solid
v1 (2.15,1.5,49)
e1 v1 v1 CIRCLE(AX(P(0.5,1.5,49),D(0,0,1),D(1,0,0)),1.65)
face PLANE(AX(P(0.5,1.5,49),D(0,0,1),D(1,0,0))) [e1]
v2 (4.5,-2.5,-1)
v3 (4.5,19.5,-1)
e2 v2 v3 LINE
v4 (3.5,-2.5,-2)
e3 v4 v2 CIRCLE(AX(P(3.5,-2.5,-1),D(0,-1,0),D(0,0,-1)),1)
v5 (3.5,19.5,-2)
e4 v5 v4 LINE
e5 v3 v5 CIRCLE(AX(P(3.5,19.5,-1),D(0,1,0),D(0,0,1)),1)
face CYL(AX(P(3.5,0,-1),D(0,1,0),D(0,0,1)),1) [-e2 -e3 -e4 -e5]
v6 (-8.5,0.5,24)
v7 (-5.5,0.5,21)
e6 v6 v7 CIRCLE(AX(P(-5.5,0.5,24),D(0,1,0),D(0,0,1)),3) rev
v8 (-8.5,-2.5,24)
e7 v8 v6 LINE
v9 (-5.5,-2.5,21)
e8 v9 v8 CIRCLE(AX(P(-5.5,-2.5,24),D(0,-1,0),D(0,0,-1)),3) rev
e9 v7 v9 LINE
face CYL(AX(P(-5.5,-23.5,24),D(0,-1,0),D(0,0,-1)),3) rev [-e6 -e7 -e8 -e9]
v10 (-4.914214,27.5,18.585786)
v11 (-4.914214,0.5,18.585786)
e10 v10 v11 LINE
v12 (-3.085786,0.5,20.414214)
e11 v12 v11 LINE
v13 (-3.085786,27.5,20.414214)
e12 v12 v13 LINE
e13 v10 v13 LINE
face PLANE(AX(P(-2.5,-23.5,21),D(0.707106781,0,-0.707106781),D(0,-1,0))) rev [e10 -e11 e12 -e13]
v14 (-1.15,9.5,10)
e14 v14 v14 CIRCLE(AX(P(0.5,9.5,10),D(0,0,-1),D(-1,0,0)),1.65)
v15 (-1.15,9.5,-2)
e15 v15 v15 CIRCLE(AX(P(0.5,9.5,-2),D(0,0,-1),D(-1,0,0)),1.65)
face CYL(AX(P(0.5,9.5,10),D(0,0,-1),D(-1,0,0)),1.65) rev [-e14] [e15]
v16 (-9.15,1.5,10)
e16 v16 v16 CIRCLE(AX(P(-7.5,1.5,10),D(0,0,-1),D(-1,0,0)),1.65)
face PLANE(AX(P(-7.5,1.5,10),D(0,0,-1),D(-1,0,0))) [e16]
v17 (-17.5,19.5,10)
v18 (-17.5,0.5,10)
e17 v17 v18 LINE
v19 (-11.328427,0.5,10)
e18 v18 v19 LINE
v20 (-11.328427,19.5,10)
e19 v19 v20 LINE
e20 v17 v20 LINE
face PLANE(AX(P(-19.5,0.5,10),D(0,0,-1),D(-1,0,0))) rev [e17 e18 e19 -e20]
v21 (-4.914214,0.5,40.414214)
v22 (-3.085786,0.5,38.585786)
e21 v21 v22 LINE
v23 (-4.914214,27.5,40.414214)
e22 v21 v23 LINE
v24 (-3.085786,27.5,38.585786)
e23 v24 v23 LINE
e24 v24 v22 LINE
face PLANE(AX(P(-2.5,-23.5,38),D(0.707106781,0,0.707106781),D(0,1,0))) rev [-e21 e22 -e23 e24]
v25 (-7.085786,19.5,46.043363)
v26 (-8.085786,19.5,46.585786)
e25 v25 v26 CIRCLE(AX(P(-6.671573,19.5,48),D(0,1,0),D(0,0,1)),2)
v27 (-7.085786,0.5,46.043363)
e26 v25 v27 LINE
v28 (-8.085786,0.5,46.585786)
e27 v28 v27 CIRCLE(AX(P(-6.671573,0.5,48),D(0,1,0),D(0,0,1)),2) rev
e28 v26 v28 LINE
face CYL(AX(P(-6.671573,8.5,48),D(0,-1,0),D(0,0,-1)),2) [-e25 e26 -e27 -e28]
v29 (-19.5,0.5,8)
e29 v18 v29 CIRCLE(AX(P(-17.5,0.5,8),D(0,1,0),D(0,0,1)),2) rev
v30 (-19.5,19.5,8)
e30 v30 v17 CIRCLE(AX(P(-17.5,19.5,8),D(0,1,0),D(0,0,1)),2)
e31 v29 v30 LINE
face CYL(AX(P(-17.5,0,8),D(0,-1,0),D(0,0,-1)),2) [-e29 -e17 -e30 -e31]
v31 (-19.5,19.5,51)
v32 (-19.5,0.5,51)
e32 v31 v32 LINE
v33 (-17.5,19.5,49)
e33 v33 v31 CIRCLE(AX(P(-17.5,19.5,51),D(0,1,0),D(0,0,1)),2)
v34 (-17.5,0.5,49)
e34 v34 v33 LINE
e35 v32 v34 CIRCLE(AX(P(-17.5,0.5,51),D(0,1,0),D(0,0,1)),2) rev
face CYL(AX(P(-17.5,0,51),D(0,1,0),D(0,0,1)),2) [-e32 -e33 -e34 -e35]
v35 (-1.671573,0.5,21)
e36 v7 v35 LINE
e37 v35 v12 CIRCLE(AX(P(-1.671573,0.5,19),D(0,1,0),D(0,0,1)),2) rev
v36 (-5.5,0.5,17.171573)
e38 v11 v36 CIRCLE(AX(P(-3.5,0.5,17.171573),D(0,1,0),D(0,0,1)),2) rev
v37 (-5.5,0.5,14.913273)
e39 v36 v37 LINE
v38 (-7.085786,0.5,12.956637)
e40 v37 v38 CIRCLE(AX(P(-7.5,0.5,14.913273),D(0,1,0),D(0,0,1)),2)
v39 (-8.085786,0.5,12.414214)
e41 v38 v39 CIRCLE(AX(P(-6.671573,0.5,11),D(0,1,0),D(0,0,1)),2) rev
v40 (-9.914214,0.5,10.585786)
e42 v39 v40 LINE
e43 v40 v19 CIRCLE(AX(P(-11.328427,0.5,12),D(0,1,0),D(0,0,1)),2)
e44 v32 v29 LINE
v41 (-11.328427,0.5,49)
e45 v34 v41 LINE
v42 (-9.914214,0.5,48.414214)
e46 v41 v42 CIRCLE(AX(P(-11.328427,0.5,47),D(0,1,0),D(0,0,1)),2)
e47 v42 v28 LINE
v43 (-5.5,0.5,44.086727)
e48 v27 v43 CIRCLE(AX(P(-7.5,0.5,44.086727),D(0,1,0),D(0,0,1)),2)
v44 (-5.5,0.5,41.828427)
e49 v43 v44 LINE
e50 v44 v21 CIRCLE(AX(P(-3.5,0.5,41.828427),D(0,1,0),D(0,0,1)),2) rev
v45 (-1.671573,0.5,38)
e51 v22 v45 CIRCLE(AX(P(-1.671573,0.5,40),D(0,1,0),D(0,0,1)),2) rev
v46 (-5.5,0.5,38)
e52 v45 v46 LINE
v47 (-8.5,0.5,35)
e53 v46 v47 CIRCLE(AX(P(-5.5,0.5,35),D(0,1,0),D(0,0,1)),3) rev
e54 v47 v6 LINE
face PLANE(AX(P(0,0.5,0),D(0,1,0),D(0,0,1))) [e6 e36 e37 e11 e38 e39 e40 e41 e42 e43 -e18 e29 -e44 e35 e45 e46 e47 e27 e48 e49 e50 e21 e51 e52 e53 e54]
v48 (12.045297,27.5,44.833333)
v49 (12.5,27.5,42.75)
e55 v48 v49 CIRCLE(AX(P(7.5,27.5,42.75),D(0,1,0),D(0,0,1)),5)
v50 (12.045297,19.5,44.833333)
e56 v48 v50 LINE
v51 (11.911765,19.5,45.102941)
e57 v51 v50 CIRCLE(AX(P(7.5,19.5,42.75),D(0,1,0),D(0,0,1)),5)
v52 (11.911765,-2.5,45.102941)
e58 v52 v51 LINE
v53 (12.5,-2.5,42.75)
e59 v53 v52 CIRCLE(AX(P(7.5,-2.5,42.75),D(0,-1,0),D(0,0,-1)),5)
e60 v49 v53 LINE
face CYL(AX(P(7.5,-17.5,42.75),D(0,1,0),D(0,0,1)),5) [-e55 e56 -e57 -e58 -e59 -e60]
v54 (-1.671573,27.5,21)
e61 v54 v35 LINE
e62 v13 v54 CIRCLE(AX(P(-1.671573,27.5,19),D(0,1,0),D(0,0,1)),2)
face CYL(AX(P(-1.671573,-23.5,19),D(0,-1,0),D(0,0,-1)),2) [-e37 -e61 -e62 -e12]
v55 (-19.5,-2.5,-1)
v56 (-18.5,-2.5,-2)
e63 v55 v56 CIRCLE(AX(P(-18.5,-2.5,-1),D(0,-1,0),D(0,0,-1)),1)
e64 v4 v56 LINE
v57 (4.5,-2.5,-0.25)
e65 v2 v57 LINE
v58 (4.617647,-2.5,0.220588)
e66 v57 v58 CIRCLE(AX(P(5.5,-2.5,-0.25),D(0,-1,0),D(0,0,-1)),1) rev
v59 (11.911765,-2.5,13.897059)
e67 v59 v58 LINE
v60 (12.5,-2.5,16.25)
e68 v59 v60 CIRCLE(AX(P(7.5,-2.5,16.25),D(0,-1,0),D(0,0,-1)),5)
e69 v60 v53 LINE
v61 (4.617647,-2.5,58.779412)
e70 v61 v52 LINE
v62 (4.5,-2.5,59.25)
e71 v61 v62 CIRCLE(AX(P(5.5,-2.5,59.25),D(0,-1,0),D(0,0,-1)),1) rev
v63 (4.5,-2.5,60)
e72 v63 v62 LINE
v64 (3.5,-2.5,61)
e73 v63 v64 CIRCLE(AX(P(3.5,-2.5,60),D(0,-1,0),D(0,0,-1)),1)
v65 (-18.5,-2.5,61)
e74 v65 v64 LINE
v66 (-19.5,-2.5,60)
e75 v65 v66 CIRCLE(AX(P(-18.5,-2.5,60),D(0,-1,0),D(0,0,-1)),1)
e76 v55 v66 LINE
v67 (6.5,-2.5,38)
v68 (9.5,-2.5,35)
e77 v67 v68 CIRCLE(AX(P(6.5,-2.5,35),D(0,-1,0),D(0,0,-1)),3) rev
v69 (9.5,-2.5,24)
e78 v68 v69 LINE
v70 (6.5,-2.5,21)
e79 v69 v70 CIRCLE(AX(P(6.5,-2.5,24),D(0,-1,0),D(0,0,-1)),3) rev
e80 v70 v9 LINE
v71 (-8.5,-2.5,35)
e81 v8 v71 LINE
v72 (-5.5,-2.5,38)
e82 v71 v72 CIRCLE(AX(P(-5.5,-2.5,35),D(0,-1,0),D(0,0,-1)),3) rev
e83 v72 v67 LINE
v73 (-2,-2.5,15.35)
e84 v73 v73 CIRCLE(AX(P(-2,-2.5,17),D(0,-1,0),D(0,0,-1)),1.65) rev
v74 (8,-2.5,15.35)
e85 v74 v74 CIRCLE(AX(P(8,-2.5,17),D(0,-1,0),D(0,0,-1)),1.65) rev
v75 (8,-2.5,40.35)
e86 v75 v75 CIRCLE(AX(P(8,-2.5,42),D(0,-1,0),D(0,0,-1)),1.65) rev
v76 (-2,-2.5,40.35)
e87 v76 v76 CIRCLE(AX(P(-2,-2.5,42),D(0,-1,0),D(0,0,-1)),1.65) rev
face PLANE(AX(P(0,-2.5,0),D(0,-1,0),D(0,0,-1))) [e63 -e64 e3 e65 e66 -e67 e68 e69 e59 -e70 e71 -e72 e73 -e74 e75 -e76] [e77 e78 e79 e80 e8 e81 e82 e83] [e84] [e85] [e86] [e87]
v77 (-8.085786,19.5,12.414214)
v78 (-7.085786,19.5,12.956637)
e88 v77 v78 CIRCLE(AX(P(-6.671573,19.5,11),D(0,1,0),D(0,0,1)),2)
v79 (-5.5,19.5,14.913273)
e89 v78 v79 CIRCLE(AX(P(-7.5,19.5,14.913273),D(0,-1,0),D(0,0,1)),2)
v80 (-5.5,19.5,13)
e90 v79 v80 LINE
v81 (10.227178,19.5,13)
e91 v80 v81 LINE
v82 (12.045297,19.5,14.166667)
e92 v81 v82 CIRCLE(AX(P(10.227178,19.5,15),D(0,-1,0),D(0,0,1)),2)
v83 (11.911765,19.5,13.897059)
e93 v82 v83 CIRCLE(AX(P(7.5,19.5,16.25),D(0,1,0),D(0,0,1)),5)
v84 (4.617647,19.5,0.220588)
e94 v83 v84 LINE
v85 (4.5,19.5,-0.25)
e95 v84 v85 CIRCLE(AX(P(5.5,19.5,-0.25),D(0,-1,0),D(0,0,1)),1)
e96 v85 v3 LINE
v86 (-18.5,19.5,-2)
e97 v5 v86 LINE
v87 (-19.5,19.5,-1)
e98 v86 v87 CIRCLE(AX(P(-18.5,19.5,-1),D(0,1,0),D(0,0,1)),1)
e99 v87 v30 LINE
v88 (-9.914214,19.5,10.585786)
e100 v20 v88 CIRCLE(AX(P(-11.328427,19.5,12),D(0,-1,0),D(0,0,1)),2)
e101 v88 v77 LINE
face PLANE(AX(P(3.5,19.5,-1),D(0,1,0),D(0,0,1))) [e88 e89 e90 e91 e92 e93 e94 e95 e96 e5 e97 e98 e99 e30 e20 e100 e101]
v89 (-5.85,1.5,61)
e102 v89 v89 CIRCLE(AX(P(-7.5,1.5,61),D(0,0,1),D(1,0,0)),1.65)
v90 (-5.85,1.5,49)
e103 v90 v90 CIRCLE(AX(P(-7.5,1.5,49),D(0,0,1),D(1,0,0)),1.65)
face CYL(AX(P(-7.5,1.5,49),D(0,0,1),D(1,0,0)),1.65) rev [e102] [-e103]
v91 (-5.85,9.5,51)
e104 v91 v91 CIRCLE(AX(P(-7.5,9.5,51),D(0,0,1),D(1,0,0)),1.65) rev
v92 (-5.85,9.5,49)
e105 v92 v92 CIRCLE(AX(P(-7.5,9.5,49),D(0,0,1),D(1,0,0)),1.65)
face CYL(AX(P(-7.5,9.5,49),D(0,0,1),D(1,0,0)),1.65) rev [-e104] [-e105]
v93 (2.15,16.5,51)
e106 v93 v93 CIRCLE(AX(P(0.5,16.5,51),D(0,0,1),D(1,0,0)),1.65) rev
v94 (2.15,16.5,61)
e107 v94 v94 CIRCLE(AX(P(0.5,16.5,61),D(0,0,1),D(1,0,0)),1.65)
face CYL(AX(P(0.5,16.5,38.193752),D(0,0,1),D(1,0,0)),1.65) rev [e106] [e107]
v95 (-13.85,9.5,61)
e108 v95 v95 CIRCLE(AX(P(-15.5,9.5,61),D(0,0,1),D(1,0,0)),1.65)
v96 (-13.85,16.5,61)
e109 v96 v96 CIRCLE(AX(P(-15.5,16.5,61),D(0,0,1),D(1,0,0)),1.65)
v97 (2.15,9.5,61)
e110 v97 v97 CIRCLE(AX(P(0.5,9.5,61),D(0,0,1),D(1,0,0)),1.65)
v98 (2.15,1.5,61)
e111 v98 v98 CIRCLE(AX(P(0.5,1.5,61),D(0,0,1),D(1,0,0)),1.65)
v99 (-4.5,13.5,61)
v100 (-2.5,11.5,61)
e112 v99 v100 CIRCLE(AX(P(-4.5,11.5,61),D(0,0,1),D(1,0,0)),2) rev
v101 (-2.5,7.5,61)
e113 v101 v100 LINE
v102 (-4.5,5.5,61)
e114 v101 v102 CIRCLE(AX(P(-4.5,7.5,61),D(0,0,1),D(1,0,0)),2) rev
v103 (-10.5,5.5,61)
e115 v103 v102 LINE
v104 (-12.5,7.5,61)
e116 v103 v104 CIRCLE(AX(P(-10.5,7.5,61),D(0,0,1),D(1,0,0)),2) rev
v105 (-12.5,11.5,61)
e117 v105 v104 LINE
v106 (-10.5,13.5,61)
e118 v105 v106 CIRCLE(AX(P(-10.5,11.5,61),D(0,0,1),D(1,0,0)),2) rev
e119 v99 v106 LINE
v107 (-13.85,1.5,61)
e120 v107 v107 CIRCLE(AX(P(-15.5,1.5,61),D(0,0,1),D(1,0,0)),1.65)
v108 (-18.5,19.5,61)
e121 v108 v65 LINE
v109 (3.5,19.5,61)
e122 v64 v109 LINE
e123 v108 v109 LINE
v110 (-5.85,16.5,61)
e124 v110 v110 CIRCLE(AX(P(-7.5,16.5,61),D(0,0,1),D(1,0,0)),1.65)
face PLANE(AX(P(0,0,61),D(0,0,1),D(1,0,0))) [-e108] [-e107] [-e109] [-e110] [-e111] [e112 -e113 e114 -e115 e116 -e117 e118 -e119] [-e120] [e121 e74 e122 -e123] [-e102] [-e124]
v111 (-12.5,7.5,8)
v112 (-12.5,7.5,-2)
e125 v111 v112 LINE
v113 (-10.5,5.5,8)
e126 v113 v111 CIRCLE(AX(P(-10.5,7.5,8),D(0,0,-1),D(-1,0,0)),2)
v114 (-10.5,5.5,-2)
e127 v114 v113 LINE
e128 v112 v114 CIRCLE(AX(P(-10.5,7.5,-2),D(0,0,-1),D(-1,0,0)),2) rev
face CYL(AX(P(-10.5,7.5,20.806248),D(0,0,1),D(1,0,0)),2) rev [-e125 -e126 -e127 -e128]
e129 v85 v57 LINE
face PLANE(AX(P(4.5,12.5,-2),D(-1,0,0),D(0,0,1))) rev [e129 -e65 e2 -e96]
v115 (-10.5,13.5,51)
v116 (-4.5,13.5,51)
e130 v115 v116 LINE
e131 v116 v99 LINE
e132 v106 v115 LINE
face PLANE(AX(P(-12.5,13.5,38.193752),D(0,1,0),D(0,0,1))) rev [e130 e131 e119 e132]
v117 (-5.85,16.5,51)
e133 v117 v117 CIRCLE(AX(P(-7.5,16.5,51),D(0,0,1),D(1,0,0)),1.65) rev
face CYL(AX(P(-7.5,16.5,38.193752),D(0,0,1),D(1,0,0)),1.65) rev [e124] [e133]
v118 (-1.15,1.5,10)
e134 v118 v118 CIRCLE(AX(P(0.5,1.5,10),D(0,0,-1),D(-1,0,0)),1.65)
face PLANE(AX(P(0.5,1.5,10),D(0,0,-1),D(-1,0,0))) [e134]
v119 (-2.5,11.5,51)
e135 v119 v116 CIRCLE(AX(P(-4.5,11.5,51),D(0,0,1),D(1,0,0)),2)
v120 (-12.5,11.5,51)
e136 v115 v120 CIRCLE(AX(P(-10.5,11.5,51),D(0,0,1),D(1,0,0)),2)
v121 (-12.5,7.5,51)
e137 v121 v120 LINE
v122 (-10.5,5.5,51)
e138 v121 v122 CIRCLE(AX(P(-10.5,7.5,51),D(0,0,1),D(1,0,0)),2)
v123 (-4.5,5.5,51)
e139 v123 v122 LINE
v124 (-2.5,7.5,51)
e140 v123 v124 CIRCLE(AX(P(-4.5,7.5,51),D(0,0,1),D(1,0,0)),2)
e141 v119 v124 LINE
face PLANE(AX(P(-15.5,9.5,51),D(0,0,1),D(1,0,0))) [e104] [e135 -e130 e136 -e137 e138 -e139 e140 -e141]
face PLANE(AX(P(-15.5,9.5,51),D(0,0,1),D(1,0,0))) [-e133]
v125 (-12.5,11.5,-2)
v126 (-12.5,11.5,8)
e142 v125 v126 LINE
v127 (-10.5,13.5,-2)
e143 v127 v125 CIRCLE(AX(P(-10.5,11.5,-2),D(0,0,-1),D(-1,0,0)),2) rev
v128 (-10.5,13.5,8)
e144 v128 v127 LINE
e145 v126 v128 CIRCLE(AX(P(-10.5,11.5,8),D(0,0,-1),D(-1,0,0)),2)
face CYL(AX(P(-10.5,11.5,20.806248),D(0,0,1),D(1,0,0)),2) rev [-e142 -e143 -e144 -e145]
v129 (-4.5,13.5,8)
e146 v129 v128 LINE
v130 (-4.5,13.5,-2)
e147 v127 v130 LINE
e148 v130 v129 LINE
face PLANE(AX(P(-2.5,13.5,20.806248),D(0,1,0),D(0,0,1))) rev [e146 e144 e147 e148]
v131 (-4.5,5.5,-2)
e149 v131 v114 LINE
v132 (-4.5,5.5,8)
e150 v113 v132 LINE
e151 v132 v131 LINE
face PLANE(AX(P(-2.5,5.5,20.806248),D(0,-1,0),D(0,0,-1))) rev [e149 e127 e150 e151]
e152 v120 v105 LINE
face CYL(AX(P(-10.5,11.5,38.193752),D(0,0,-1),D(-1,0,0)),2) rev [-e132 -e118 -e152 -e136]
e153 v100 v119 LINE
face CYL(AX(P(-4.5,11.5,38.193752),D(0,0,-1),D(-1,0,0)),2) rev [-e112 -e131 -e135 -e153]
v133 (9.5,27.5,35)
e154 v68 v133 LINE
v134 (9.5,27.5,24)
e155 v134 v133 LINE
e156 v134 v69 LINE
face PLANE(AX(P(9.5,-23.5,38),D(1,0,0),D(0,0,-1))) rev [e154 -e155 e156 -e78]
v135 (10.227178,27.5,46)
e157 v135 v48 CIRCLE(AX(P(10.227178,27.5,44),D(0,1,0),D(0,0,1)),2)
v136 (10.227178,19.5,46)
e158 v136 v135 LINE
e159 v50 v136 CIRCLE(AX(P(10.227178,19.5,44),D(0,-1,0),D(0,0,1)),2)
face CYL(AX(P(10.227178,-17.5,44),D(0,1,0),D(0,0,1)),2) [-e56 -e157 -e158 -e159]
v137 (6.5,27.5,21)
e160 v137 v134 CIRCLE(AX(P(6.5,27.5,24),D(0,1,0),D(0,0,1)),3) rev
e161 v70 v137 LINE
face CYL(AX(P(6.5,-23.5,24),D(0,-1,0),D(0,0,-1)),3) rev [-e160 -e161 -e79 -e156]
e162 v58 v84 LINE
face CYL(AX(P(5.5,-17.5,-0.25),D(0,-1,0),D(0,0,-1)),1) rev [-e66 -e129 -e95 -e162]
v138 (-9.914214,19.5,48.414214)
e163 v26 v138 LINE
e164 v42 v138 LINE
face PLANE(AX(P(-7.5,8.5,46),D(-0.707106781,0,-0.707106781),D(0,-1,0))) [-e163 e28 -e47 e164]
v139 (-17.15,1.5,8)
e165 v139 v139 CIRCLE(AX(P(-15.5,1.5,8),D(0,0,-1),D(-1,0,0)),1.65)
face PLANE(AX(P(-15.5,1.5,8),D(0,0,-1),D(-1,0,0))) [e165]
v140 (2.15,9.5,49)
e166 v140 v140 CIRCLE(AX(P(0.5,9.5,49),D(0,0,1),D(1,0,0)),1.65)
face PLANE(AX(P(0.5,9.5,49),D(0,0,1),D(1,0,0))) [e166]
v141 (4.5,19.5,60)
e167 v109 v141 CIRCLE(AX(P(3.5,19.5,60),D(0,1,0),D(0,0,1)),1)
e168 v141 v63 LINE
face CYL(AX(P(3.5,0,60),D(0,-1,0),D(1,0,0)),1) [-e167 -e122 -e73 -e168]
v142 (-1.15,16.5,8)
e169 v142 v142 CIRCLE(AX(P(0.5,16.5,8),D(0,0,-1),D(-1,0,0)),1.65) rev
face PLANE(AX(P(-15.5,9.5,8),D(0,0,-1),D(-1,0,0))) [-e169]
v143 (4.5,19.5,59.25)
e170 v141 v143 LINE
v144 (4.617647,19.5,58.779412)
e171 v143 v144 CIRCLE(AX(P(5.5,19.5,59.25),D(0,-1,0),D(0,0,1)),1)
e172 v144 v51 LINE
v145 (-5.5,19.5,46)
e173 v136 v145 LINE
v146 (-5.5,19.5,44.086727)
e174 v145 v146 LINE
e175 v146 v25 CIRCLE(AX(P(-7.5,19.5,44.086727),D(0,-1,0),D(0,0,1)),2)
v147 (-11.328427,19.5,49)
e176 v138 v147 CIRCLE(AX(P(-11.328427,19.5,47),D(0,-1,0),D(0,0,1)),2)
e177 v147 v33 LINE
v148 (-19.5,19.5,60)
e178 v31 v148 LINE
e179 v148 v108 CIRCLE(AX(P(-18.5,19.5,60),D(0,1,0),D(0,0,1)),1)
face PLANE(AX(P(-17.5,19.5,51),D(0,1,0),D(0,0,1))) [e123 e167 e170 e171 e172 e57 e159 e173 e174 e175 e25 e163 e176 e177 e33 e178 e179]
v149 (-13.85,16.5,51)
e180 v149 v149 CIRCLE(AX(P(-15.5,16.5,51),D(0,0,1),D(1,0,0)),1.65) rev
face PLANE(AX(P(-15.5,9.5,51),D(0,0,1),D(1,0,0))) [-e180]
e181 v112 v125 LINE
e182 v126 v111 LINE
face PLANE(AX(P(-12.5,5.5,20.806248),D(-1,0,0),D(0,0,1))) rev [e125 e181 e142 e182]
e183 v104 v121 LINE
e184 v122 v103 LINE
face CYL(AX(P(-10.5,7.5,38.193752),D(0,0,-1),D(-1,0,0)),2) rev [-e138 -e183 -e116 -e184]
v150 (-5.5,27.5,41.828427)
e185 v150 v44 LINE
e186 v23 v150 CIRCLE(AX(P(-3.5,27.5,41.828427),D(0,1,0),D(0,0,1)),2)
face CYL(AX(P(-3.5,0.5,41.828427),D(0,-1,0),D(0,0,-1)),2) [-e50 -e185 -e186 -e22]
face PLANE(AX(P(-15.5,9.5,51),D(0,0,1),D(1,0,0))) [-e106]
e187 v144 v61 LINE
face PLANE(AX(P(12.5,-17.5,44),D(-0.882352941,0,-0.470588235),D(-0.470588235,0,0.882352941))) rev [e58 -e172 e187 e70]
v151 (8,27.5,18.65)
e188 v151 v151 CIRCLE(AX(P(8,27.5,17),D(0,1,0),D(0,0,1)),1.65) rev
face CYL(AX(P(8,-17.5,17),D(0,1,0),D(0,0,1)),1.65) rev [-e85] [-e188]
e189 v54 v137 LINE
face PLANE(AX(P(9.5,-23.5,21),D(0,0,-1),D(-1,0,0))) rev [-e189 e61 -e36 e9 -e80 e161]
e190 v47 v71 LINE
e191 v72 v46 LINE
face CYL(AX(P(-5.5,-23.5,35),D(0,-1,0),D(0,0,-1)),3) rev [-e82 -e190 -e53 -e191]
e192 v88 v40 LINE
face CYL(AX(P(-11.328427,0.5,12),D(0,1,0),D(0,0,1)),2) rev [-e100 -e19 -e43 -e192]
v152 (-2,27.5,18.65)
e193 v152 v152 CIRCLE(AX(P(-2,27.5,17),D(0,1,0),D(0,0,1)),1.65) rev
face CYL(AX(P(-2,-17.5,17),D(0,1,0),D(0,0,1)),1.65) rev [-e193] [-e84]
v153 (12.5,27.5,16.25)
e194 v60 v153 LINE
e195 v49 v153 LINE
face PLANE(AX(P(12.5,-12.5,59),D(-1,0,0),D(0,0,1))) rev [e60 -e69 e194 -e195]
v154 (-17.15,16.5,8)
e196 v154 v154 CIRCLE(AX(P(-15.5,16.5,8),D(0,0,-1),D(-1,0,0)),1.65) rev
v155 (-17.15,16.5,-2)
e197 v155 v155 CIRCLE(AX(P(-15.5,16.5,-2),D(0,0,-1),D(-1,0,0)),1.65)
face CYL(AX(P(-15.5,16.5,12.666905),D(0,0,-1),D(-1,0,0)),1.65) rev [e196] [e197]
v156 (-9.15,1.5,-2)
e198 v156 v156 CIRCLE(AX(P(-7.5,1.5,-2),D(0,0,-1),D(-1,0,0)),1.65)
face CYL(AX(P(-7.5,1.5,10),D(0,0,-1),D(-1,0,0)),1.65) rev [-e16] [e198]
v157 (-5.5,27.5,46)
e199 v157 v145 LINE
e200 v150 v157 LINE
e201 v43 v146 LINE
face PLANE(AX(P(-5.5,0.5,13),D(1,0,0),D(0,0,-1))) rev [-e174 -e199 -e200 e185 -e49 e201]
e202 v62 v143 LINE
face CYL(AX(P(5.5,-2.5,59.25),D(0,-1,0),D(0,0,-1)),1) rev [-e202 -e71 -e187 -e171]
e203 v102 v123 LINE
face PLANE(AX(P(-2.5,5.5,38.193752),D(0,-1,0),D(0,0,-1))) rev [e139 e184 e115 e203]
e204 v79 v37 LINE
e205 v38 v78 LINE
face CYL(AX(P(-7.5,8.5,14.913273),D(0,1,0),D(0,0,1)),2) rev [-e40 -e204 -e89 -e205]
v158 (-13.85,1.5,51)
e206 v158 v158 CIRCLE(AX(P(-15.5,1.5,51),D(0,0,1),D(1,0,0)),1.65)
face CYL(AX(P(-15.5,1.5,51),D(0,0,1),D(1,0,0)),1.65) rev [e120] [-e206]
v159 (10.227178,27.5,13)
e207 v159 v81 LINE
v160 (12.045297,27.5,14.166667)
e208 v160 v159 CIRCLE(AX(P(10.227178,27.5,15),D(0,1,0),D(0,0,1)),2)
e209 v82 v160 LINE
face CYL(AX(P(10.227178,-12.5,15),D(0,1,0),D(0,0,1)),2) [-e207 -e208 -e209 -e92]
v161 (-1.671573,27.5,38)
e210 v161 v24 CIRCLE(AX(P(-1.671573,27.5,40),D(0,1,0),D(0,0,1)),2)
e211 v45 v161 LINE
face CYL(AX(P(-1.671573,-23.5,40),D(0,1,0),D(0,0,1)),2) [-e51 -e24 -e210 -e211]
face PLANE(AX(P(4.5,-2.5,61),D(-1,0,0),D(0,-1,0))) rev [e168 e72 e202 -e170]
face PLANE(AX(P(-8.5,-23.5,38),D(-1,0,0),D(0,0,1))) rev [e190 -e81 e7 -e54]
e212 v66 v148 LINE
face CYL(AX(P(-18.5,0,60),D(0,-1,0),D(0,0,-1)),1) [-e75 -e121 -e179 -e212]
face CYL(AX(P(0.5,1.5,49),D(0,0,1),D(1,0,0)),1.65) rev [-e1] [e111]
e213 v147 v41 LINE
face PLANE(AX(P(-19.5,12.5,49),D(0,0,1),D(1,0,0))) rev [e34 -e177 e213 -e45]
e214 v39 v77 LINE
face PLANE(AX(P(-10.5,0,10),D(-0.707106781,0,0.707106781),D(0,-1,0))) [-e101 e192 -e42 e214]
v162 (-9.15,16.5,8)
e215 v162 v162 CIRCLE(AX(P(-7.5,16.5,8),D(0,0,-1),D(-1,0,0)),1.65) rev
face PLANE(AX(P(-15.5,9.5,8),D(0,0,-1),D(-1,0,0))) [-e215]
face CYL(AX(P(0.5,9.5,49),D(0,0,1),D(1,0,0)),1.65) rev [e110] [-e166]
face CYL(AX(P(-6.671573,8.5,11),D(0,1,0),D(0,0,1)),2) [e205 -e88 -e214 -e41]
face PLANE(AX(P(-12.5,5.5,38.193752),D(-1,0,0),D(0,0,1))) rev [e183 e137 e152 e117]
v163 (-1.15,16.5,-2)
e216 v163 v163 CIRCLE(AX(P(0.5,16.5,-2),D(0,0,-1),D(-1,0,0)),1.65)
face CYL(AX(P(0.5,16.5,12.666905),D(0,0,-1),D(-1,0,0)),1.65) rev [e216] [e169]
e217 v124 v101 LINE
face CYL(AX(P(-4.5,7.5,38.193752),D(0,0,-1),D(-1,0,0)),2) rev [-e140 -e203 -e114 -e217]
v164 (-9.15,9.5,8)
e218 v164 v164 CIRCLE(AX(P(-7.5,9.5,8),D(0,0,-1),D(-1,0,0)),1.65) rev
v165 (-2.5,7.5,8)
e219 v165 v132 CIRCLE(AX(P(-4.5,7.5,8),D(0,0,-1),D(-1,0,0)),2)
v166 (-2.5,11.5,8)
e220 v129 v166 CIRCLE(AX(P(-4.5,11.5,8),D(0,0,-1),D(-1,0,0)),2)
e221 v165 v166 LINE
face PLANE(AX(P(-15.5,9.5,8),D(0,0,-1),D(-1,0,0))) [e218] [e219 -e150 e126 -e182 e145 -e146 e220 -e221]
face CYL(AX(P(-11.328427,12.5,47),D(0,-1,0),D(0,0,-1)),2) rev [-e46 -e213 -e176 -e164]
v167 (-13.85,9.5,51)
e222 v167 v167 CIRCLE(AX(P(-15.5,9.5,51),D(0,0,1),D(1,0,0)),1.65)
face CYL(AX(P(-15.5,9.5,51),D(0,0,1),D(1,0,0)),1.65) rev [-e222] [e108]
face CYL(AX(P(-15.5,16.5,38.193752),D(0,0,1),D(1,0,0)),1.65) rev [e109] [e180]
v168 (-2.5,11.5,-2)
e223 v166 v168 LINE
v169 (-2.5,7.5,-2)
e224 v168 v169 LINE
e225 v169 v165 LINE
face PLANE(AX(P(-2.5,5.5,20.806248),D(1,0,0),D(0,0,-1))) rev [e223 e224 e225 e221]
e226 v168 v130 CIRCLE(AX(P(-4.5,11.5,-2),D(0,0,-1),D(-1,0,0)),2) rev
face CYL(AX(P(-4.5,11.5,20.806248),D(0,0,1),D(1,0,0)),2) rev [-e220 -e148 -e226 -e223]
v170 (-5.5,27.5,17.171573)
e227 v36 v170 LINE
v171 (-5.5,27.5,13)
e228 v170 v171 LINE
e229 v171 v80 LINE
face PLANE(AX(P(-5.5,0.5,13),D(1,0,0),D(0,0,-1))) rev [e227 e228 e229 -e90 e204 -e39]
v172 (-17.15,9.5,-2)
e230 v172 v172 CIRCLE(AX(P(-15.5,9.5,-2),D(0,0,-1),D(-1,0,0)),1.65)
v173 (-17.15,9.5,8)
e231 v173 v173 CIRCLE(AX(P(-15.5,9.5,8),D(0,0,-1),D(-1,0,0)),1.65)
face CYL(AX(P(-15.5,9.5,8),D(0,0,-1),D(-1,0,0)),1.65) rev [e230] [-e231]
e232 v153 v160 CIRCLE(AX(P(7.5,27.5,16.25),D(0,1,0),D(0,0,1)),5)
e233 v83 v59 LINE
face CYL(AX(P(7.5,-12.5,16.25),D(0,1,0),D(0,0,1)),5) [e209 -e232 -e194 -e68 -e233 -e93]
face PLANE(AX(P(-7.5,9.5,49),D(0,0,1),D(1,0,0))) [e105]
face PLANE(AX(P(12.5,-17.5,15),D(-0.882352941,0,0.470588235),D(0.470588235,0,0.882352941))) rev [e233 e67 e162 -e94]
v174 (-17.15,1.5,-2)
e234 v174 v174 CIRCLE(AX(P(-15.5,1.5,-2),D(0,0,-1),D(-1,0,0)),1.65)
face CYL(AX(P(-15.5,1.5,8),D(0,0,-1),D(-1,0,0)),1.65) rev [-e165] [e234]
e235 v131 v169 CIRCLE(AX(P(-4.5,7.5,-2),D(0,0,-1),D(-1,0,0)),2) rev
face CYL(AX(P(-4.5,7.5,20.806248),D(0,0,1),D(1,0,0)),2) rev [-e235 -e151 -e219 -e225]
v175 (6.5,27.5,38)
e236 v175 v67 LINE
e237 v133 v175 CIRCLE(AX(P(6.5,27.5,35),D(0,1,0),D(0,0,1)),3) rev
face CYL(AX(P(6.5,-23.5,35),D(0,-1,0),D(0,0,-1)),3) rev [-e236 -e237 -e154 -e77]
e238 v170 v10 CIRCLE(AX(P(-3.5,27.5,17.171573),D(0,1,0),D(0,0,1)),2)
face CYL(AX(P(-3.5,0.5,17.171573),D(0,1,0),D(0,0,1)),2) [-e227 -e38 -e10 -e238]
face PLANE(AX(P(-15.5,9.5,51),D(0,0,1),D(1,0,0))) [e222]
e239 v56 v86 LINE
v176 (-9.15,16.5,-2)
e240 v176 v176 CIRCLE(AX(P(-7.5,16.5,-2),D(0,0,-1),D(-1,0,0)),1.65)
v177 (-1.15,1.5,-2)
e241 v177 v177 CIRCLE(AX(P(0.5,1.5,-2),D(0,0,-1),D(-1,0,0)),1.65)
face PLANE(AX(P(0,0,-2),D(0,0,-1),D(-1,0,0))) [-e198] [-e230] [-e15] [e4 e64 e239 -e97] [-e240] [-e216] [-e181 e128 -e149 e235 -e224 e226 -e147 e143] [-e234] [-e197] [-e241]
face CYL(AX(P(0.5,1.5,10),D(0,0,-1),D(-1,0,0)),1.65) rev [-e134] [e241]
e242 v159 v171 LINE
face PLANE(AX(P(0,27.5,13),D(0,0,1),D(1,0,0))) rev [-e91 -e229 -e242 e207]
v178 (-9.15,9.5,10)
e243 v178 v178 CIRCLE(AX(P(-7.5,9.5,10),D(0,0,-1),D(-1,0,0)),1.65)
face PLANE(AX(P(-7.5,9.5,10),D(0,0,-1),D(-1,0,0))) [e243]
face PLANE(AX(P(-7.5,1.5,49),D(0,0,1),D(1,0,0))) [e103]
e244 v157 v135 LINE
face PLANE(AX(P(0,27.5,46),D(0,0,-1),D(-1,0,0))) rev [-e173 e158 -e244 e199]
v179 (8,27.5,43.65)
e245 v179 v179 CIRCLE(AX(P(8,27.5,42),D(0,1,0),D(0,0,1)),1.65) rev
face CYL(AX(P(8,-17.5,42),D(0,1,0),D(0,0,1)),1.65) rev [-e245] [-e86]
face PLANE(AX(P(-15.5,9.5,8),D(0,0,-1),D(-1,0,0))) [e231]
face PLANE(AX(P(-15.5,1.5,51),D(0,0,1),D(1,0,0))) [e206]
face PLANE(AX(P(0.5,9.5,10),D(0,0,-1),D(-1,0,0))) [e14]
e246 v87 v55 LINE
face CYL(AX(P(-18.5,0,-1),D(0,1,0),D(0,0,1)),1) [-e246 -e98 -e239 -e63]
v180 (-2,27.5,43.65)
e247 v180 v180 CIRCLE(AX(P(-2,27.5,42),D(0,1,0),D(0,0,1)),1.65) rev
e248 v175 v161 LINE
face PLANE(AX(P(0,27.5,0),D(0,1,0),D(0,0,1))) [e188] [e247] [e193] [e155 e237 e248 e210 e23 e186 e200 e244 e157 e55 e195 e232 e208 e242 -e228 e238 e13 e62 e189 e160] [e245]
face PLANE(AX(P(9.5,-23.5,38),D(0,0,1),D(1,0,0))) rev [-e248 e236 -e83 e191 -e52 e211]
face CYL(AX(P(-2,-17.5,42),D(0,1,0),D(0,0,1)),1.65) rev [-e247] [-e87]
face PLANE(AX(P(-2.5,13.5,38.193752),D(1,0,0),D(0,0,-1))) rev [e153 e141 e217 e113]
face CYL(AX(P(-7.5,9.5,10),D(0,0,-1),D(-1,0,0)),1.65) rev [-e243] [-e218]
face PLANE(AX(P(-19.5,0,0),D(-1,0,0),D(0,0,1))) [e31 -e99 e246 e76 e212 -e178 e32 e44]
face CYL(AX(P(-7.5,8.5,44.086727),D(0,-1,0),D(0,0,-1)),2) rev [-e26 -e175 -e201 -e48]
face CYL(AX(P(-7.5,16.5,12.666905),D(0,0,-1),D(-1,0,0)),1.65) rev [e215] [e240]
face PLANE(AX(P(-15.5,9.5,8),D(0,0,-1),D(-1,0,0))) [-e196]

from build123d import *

# Parameters (mm, degrees)
SKETCH_1_W           = 25
SKETCH_1_H           = 25
EXTRUDE_1_DEPTH      = 59
SKETCH_2_R           = 1.65
CUT_EXTRUDE_1_DEPTH  = 10
CUT_EXTRUDE_START    = -10
SKETCH_3_R           = 1.65
CUT_EXTRUDE_2_DEPTH  = 10
SKETCH_4_R           = 1.65
CUT_EXTRUDE_3_DEPTH  = 30
SKETCH_7_W           = 51
SKETCH_7_H           = 17
CUT_EXTRUDE_5_DEPTH  = 2
SKETCH_8_W           = 18
SKETCH_8_H           = 17
CUT_EXTRUDE_6_DEPTH  = 36
SKETCH_10_R          = 1.65
SKETCH_10_W          = 18
SKETCH_10_H          = 17
CUT_EXTRUDE_8_DEPTH  = 4
SKETCH_13_W          = 2
SKETCH_13_H          = 9
CUT_EXTRUDE_11_DEPTH = 4
SKETCH_15_W          = 5
SKETCH_15_H          = 33
CUT_EXTRUDE_13_DEPTH = 8
CHAMFER_1_SIZE       = 3
FILLET_7_R           = 1
SKETCH_17_W          = 2
SKETCH_17_H          = 61.49877521
CUT_EXTRUDE_15_DEPTH = 32
SKETCH_18_W          = 23
SKETCH_18_H          = 59
CUT_EXTRUDE_16_DEPTH = 10
EXTRUDE_START        = -10
SKETCH_19_R          = 1.65
EXTRUDE_2_DEPTH      = 10
SKETCH_20_R          = 1.65
EXTRUDE_3_DEPTH      = 10
SKETCH_23_R          = 1.65
CUT_EXTRUDE_17_DEPTH = 10
SKETCH_24_R          = 1.65
CUT_EXTRUDE_18_DEPTH = 10
CUT_EXTRUDE_19_DEPTH = 30
FILLET_9_R           = 5
FILLET_10_R          = 3
EXTRUDE_4_DEPTH      = 9
SKETCH_26_R          = 1.65
CUT_EXTRUDE_20_DEPTH = 8
CUT_EXTRUDE_START_2  = -8
SKETCH_27_R          = 1.65
CUT_EXTRUDE_21_DEPTH = 8
EXTRUDE_START_2      = 2
SKETCH_28_W          = 24
SKETCH_28_H          = 15
SKETCH_28_R          = 1.65
EXTRUDE_5_DEPTH      = 2
SKETCH_29_W          = 24
SKETCH_29_H          = 15
SKETCH_29_R          = 1.65
EXTRUDE_6_DEPTH      = 2
FILLET_11_R          = 2
FILLET_13_R          = 1
SKETCH_30_R          = 1.65
EXTRUDE_7_DEPTH      = 19
FILLET_START         = 12.5
FILLET_14_DEPTH      = 15.5
FILLET_START_2       = -2.5
FILLET_14_2_DEPTH    = 15
EXTRUDE_8_DEPTH      = 7
SKETCH_33_R          = 1.65
CUT_EXTRUDE_22_DEPTH = 10
SKETCH_34_W          = 10
SKETCH_34_H          = 8
CUT_EXTRUDE_23_DEPTH = 10
SKETCH_35_R          = 1.65
SKETCH_35_W          = 10
SKETCH_35_H          = 8
CUT_EXTRUDE_24_DEPTH = 10
FILLET_15_R          = 2


with BuildPart() as part:
    # 草图1 → 凸台-拉伸1 (new body)
    with BuildSketch(Plane.XY):
        Rectangle(SKETCH_1_W, SKETCH_1_H)
    extrude(amount=EXTRUDE_1_DEPTH)

    # 草图2 → 切除-拉伸1 (cut)
    with BuildSketch(Plane(origin=(0, 0, 0), x_dir=(-1, 0, 0), z_dir=(0, 0, -1))):
        with Locations((7.5, 8.5)):
            Circle(SKETCH_2_R)
        with Locations((7.5, -3.5)):
            Circle(SKETCH_2_R)
        with Locations((-0.5, -3.5)):
            Circle(SKETCH_2_R)
        with Locations((-0.5, 8.5)):
            Circle(SKETCH_2_R)
    extrude(amount=-CUT_EXTRUDE_1_DEPTH, mode=Mode.SUBTRACT)

    # 草图3 → 切除-拉伸2 (cut)
    with BuildSketch(Plane.XY.offset(59).offset(CUT_EXTRUDE_START)):
        with Locations(Location((0.5, -3.5, 0), (0, 0, 180))):
            Circle(SKETCH_3_R)
        with Locations(Location((-7.5, -3.5, 0), (0, 0, 180))):
            Circle(SKETCH_3_R)
        with Locations(Location((-7.5, 8.5, 0), (0, 0, 180))):
            Circle(SKETCH_3_R)
        with Locations(Location((0.5, 8.5, 0), (0, 0, 180))):
            Circle(SKETCH_3_R)
    extrude(amount=CUT_EXTRUDE_2_DEPTH, mode=Mode.SUBTRACT)

    # 草图4 → 切除-拉伸3 (cut)
    with BuildSketch(Plane(origin=(0, 12.5, 0), x_dir=(1, 0, 0), z_dir=(0, 1, 0))):
        with Locations(Location((8, -17, 0), (0, 0, 270))):
            Circle(SKETCH_4_R)
        with Locations(Location((-2, -17, 0), (0, 0, 270))):
            Circle(SKETCH_4_R)
        with Locations(Location((-2, -42, 0), (0, 0, 270))):
            Circle(SKETCH_4_R)
        with Locations(Location((8, -42, 0), (0, 0, 270))):
            Circle(SKETCH_4_R)
    extrude(amount=-CUT_EXTRUDE_3_DEPTH, mode=Mode.SUBTRACT)

    # 草图7 → 切除-拉伸5 (cut)
    with BuildSketch(Plane.ZY.offset(12.5)):
        with Locations((29.5, 0)):
            Rectangle(SKETCH_7_W, SKETCH_7_H)
    extrude(amount=-CUT_EXTRUDE_5_DEPTH, mode=Mode.SUBTRACT)

    # 草图8 → 切除-拉伸6 (cut)
    with BuildSketch(Plane(origin=(0, 12.5, 0), x_dir=(1, 0, 0), z_dir=(0, 1, 0))):
        with Locations((0.5, -29.5)):
            Rectangle(SKETCH_8_W, SKETCH_8_H)
    extrude(amount=-CUT_EXTRUDE_6_DEPTH, mode=Mode.SUBTRACT)

    # 草图10 → 切除-拉伸8 (cut)
    with BuildSketch(Plane(origin=(0, 12.5, 0), x_dir=(1, 0, 0), z_dir=(0, 1, 0))):
        Polygon((-12.5, -13), (-12.5, -46), (11.433333333, -46), (12.5, -44), (12.5, -15), (11.433333333, -13), align=None)
        with Locations(Location((-2, -42, 0), (0, 0, 270))):
            Circle(SKETCH_10_R, mode=Mode.SUBTRACT)
        with Locations(Location((8, -42, 0), (0, 0, 270))):
            Circle(SKETCH_10_R, mode=Mode.SUBTRACT)
        with Locations(Location((-2, -17, 0), (0, 0, 270))):
            Circle(SKETCH_10_R, mode=Mode.SUBTRACT)
        with Locations((0.5, -29.5)):
            Rectangle(SKETCH_10_W, SKETCH_10_H, mode=Mode.SUBTRACT)
        with Locations(Location((8, -17, 0), (0, 0, 270))):
            Circle(SKETCH_10_R, mode=Mode.SUBTRACT)
    extrude(amount=-CUT_EXTRUDE_8_DEPTH, mode=Mode.SUBTRACT)

    # 草图13 → 切除-拉伸11 (cut)
    with BuildSketch(Plane(origin=(0, 12.5, 0), x_dir=(1, 0, 0), z_dir=(0, 1, 0))):
        with Locations((-11.5, -50.5)):
            Rectangle(SKETCH_13_W, SKETCH_13_H)
        with Locations((-11.5, -8.5)):
            Rectangle(SKETCH_13_W, SKETCH_13_H)
    extrude(amount=-CUT_EXTRUDE_11_DEPTH, mode=Mode.SUBTRACT)

    # 草图15 → 切除-拉伸13 (cut)
    with BuildSketch(Plane(origin=(0, 8.5, 0), x_dir=(1, 0, 0), z_dir=(0, 1, 0))):
        with Locations((-8, -29.5)):
            Rectangle(SKETCH_15_W, SKETCH_15_H)
    extrude(amount=-CUT_EXTRUDE_13_DEPTH, mode=Mode.SUBTRACT)

    # 倒角1
    chamfer_1_edges = [part.edges().sort_by_distance(p)[0] for p in [
        (-10.5, 6.5, 46),
        (-10.5, 6.5, 13),
        (-5.5, 4.5, 21),
        (-5.5, 4.5, 38),
    ]]
    chamfer(chamfer_1_edges, length=CHAMFER_1_SIZE)

    # 圆角7
    fillet_7_edges = [part.edges().sort_by_distance(p)[0] for p in [
        (-5.5, 4.5, 13),
        (-5.5, 4.5, 46),
    ]]
    fillet(fillet_7_edges, radius=FILLET_7_R)

    # 草图17 → 切除-拉伸15 (cut)
    with BuildSketch(Plane(origin=(0, 12.5, 0), x_dir=(1, 0, 0), z_dir=(0, 1, 0))):
        with Locations((-11.5, -29.775532147)):
            Rectangle(SKETCH_17_W, SKETCH_17_H)
    extrude(amount=-CUT_EXTRUDE_15_DEPTH, mode=Mode.SUBTRACT)

    # 草图18 → 切除-拉伸16 (cut)
    with BuildSketch(Plane.XZ.offset(12.5)):
        with Locations((1, 29.5)):
            Rectangle(SKETCH_18_W, SKETCH_18_H)
    extrude(amount=-CUT_EXTRUDE_16_DEPTH, mode=Mode.SUBTRACT)

    # 草图19 → 凸台-拉伸2 (add)
    with BuildSketch(Plane.XY.offset(59).offset(EXTRUDE_START)):
        with Locations(Location((0.5, 8.5, 0), (0, 0, 180))):
            Circle(SKETCH_19_R)
        with Locations(Location((-7.5, 8.5, 0), (0, 0, 180))):
            Circle(SKETCH_19_R)
        with BuildLine():
            Line((-8.812440475, -2.5), (-6.187559525, -2.5))
            ThreePointArc((-6.187559525, -2.5), (-7.5, -1.85), (-8.812440475, -2.5))
        make_face()
        with BuildLine():
            Line((-0.812440475, -2.5), (1.812440475, -2.5))
            ThreePointArc((1.812440475, -2.5), (0.5, -1.85), (-0.812440475, -2.5))
        make_face()
    extrude(amount=EXTRUDE_2_DEPTH)

    # 草图20 → 凸台-拉伸3 (add)
    with BuildSketch(Plane(origin=(0, 0, 0), x_dir=(-1, 0, 0), z_dir=(0, 0, -1))):
        with Locations((7.5, 8.5)):
            Circle(SKETCH_20_R)
        with Locations((-0.5, 8.5)):
            Circle(SKETCH_20_R)
        with BuildLine():
            Line((-1.812440475, -2.5), (0.812440475, -2.5))
            ThreePointArc((0.812440475, -2.5), (-0.5, -1.85), (-1.812440475, -2.5))
        make_face()
        with BuildLine():
            Line((6.187559525, -2.5), (8.812440475, -2.5))
            ThreePointArc((8.812440475, -2.5), (7.5, -1.85), (6.187559525, -2.5))
        make_face()
    extrude(amount=-EXTRUDE_3_DEPTH)

    # 草图23 → 切除-拉伸17 (cut)
    with BuildSketch(Plane(origin=(0, 0, 0), x_dir=(-1, 0, 0), z_dir=(0, 0, -1))):
        with Locations((7.5, 1.5)):
            Circle(SKETCH_23_R)
        with Locations((-0.5, 1.5)):
            Circle(SKETCH_23_R)
        with Locations((-0.5, 9.5)):
            Circle(SKETCH_23_R)
        with Locations((7.5, 9.5)):
            Circle(SKETCH_23_R)
    extrude(amount=-CUT_EXTRUDE_17_DEPTH, mode=Mode.SUBTRACT)

    # 草图24 → 切除-拉伸18 (cut)
    with BuildSketch(Plane.XY.offset(59).offset(CUT_EXTRUDE_START)):
        with Locations(Location((-7.5, 9.5, 0), (0, 0, 180))):
            Circle(SKETCH_24_R)
        with Locations(Location((-7.5, 1.5, 0), (0, 0, 180))):
            Circle(SKETCH_24_R)
        with Locations(Location((0.5, 1.5, 0), (0, 0, 180))):
            Circle(SKETCH_24_R)
        with Locations(Location((0.5, 9.5, 0), (0, 0, 180))):
            Circle(SKETCH_24_R)
    extrude(amount=CUT_EXTRUDE_18_DEPTH, mode=Mode.SUBTRACT)

    # 草图5 → 切除-拉伸19 (cut)
    with BuildSketch(Plane(origin=(0, 12.5, 0), x_dir=(1, 0, 0), z_dir=(0, 1, 0))):
        Polygon((4.5, 0), (12.5, 0), (12.5, -15), align=None)
        Polygon((12.5, -44), (4.5, -59), (12.5, -59), align=None)
    extrude(amount=-CUT_EXTRUDE_19_DEPTH, mode=Mode.SUBTRACT)

    # 圆角9
    fillet_9_edges = [part.edges().sort_by_distance(p)[0] for p in [
        (12.5, 3, 15),
        (12.5, 3, 44),
    ]]
    fillet(fillet_9_edges, radius=FILLET_9_R)

    # 圆角10
    fillet_10_edges = [part.edges().sort_by_distance(p)[0] for p in [
        (9.5, 3, 38),
        (-8.5, -1, 38),
        (9.5, 3, 21),
        (-8.5, -1, 21),
    ]]
    fillet(fillet_10_edges, radius=FILLET_10_R)

    # 草图25 → 凸台-拉伸4 (add)
    with BuildSketch(Plane.ZY.offset(10.5)):
        Polygon((0, 12.5), (0, -2.5), (59, -2.5), (59, 12.5), (49, 12.5), (49, 0.5), (10, 0.5), (10, 12.5), align=None)
    extrude(amount=EXTRUDE_4_DEPTH)

    # 草图26 → 切除-拉伸20 (cut)
    with BuildSketch(Plane(origin=(0, 0, 0), x_dir=(-1, 0, 0), z_dir=(0, 0, -1))):
        with Locations((15.5, 9.5)):
            Circle(SKETCH_26_R)
        with Locations((15.5, 1.5)):
            Circle(SKETCH_26_R)
    extrude(amount=-CUT_EXTRUDE_20_DEPTH, mode=Mode.SUBTRACT)

    # 草图27 → 切除-拉伸21 (cut)
    with BuildSketch(Plane.XY.offset(59).offset(CUT_EXTRUDE_START_2)):
        with Locations(Location((-15.5, 1.5, 0), (0, 0, 180))):
            Circle(SKETCH_27_R)
        with Locations(Location((-15.5, 9.5, 0), (0, 0, 180))):
            Circle(SKETCH_27_R)
    extrude(amount=CUT_EXTRUDE_21_DEPTH, mode=Mode.SUBTRACT)

    # 草图28 → 凸台-拉伸5 (add)
    with BuildSketch(Plane(origin=(0, 0, 0), x_dir=(-1, 0, 0), z_dir=(0, 0, -1)).offset(EXTRUDE_START_2)):
        with Locations((7.5, 5)):
            Rectangle(SKETCH_28_W, SKETCH_28_H)
        with Locations(Location((7.5, 1.5, 0), (0, 0, 180))):
            Circle(SKETCH_28_R, mode=Mode.SUBTRACT)
        with Locations(Location((-0.5, 1.5, 0), (0, 0, 180))):
            Circle(SKETCH_28_R, mode=Mode.SUBTRACT)
        with Locations(Location((-0.5, 9.5, 0), (0, 0, 180))):
            Circle(SKETCH_28_R, mode=Mode.SUBTRACT)
        with Locations(Location((7.5, 9.5, 0), (0, 0, 180))):
            Circle(SKETCH_28_R, mode=Mode.SUBTRACT)
        with Locations(Location((15.5, 1.5, 0), (0, 0, 180))):
            Circle(SKETCH_28_R, mode=Mode.SUBTRACT)
        with Locations(Location((15.5, 9.5, 0), (0, 0, 180))):
            Circle(SKETCH_28_R, mode=Mode.SUBTRACT)
    extrude(amount=-EXTRUDE_5_DEPTH)

    # 草图29 → 凸台-拉伸6 (add)
    with BuildSketch(Plane.XY.offset(59)):
        with Locations((-7.5, 5)):
            Rectangle(SKETCH_29_W, SKETCH_29_H)
        with Locations(Location((-7.5, 9.5, 0), (0, 0, 180))):
            Circle(SKETCH_29_R, mode=Mode.SUBTRACT)
        with Locations(Location((-7.5, 1.5, 0), (0, 0, 180))):
            Circle(SKETCH_29_R, mode=Mode.SUBTRACT)
        with Locations(Location((0.5, 1.5, 0), (0, 0, 180))):
            Circle(SKETCH_29_R, mode=Mode.SUBTRACT)
        with Locations(Location((0.5, 9.5, 0), (0, 0, 180))):
            Circle(SKETCH_29_R, mode=Mode.SUBTRACT)
        with Locations(Location((-15.5, 9.5, 0), (0, 0, 180))):
            Circle(SKETCH_29_R, mode=Mode.SUBTRACT)
        with Locations(Location((-15.5, 1.5, 0), (0, 0, 180))):
            Circle(SKETCH_29_R, mode=Mode.SUBTRACT)
    extrude(amount=EXTRUDE_6_DEPTH)

    # 圆角11
    fillet_11_edges = [part.edges().sort_by_distance(p)[0] for p in [
        (-2.5, 4.5, 21),
        (-5.5, 4.5, 18),
        (-2.5, 4.5, 38),
        (-5.5, 4.5, 41),
        (-7.5, 6.5, 46),
        (-10.5, 6.5, 10),
        (-10.5, 6.5, 49),
        (-7.5, 6.5, 13),
        (-19.5, 6.5, 49),
        (-19.5, 6.5, 10),
    ]]
    fillet(fillet_11_edges, radius=FILLET_11_R)

    # 圆角13
    fillet_13_edges = [part.edges().sort_by_distance(p)[0] for p in [
        (4.5, 5, 0),
        (4.5, 5, 59),
        (4.5, 5, -2),
        (-19.5, 5, -2),
        (-19.5, 5, 61),
        (4.5, 5, 61),
    ]]
    fillet(fillet_13_edges, radius=FILLET_13_R)

    # 草图30 → 凸台-拉伸7 (add)
    with BuildSketch(Plane(origin=(0, 8.5, 0), x_dir=(1, 0, 0), z_dir=(0, 1, 0))):
        with BuildLine():
            Line((-5.5, -13), (-5.5, -14))
            Line((-5.5, -14), (-5.5, -17.171572875))
            ThreePointArc((-5.5, -17.171572875), (-5.347759065, -17.93693974), (-4.914213562, -18.585786438))
            Line((-4.914213562, -18.585786438), (-3.085786438, -20.414213562))
            ThreePointArc((-3.085786438, -20.414213562), (-2.43693974, -20.847759065), (-1.671572875, -21))
            Line((-1.671572875, -21), (6.5, -21))
            ThreePointArc((6.5, -21), (8.621320344, -21.878679656), (9.5, -24))
            Line((9.5, -24), (9.5, -35))
            ThreePointArc((9.5, -35), (8.621320344, -37.121320344), (6.5, -38))
            Line((6.5, -38), (-1.671572875, -38))
            ThreePointArc((-1.671572875, -38), (-2.43693974, -38.152240935), (-3.085786438, -38.585786438))
            Line((-3.085786438, -38.585786438), (-4.914213562, -40.414213562))
            ThreePointArc((-4.914213562, -40.414213562), (-5.347759065, -41.06306026), (-5.5, -41.828427125))
            Line((-5.5, -41.828427125), (-5.5, -45))
            Line((-5.5, -45), (-5.5, -46))
            Line((-5.5, -46), (11.433333333, -46))
            Line((11.433333333, -46), (11.911764706, -45.102941176))
            ThreePointArc((11.911764706, -45.102941176), (12.350712501, -43.962678125), (12.5, -42.75))
            Line((12.5, -42.75), (12.5, -16.25))
            ThreePointArc((12.5, -16.25), (12.350712501, -15.037321875), (11.911764706, -13.897058824))
            Line((11.911764706, -13.897058824), (11.433333333, -13))
            Line((11.433333333, -13), (-5.5, -13))
        make_face()
        with Locations(Location((-2, -42, 0), (0, 0, 270))):
            Circle(SKETCH_30_R, mode=Mode.SUBTRACT)
        with Locations(Location((8, -42, 0), (0, 0, 270))):
            Circle(SKETCH_30_R, mode=Mode.SUBTRACT)
        with Locations(Location((-2, -17, 0), (0, 0, 270))):
            Circle(SKETCH_30_R, mode=Mode.SUBTRACT)
        with Locations(Location((8, -17, 0), (0, 0, 270))):
            Circle(SKETCH_30_R, mode=Mode.SUBTRACT)
    extrude(amount=EXTRUDE_7_DEPTH)

    # 圆角14: read off the stored shape, not the designer's step
    # 圆角14 outline → 圆角14 (cut)
    with BuildSketch(Plane(origin=(0, 0, 0), x_dir=(1, 0, 0), z_dir=(0, 1, 0)).offset(FILLET_START)):
        with BuildLine():
            ThreePointArc((12.045296714, -44.833333333), (11.307301478, -45.683250823), (10.227178029, -46))
            Line((10.227178029, -46), (11.433333333, -46))
            Line((11.433333333, -46), (11.911764706, -45.102941176))
            ThreePointArc((11.911764706, -45.102941176), (11.980559052, -44.969141857), (12.045296714, -44.833333333))
        make_face()
        with BuildLine():
            Line((11.433333333, -13), (10.227178029, -13))
            ThreePointArc((10.227178029, -13), (11.307301478, -13.316749177), (12.045296714, -14.166666667))
            ThreePointArc((12.045296714, -14.166666667), (11.980559052, -14.030858143), (11.911764706, -13.897058824))
            Line((11.911764706, -13.897058824), (11.433333333, -13))
        make_face()
    extrude(amount=FILLET_14_DEPTH, mode=Mode.SUBTRACT)

    # Fillet 14 2 outline → Fillet 14 2 (add)
    with BuildSketch(Plane(origin=(0, 0, 0), x_dir=(1, 0, 0), z_dir=(0, 1, 0)).offset(FILLET_START_2)):
        with BuildLine():
            ThreePointArc((-5.5, -44.086726626), (-5.946226026, -45.346006753), (-7.085786438, -46.043363313))
            ThreePointArc((-7.085786438, -46.043363313), (-6.879811472, -46.01087037), (-6.671572875, -46))
            Line((-6.671572875, -46), (-5.5, -46))
            Line((-5.5, -46), (-5.5, -44.086726626))
        make_face()
        with BuildLine():
            ThreePointArc((-7.085786438, -12.956636687), (-5.946226026, -13.653993247), (-5.5, -14.913273374))
            Line((-5.5, -14.913273374), (-5.5, -13))
            Line((-5.5, -13), (-6.671572875, -13))
            ThreePointArc((-6.671572875, -13), (-6.879811472, -12.98912963), (-7.085786438, -12.956636687))
        make_face()
    extrude(amount=FILLET_14_2_DEPTH)

    # 草图32 → 凸台-拉伸8 (add)
    with BuildSketch(Plane(origin=(0, 12.5, 0), x_dir=(1, 0, 0), z_dir=(0, 1, 0))):
        with BuildLine():
            Line((-19.5, -51), (-19.5, -60))
            ThreePointArc((-19.5, -60), (-19.207106781, -60.707106781), (-18.5, -61))
            Line((-18.5, -61), (3.5, -61))
            ThreePointArc((3.5, -61), (4.207106781, -60.707106781), (4.5, -60))
            Line((4.5, -60), (4.5, -59.25))
            ThreePointArc((4.5, -59.25), (4.5298575, -59.007464375), (4.617647059, -58.779411765))
            Line((4.617647059, -58.779411765), (11.911764706, -45.102941176))
            ThreePointArc((11.911764706, -45.102941176), (11.980559052, -44.969141857), (12.045296714, -44.833333333))
            ThreePointArc((12.045296714, -44.833333333), (11.307301478, -45.683250823), (10.227178029, -46))
            Line((10.227178029, -46), (-5.5, -46))
            Line((-5.5, -46), (-5.5, -44.086726626))
            ThreePointArc((-5.5, -44.086726626), (-5.946226026, -45.346006753), (-7.085786438, -46.043363313))
            ThreePointArc((-7.085786438, -46.043363313), (-7.625167207, -46.241973308), (-8.085786438, -46.585786438))
            Line((-8.085786438, -46.585786438), (-9.914213562, -48.414213562))
            ThreePointArc((-9.914213562, -48.414213562), (-10.56306026, -48.847759065), (-11.328427125, -49))
            Line((-11.328427125, -49), (-17.5, -49))
            ThreePointArc((-17.5, -49), (-18.914213562, -49.585786438), (-19.5, -51))
        make_face()
        with BuildLine():
            Line((3.5, 2), (-18.5, 2))
            ThreePointArc((-18.5, 2), (-19.207106781, 1.707106781), (-19.5, 1))
            Line((-19.5, 1), (-19.5, -8))
            ThreePointArc((-19.5, -8), (-18.914213562, -9.414213562), (-17.5, -10))
            Line((-17.5, -10), (-11.328427125, -10))
            ThreePointArc((-11.328427125, -10), (-10.56306026, -10.152240935), (-9.914213562, -10.585786438))
            Line((-9.914213562, -10.585786438), (-8.085786438, -12.414213562))
            ThreePointArc((-8.085786438, -12.414213562), (-7.625167207, -12.758026692), (-7.085786438, -12.956636687))
            ThreePointArc((-7.085786438, -12.956636687), (-5.946226026, -13.653993247), (-5.5, -14.913273374))
            Line((-5.5, -14.913273374), (-5.5, -13))
            Line((-5.5, -13), (10.227178029, -13))
            ThreePointArc((10.227178029, -13), (11.307301478, -13.316749177), (12.045296714, -14.166666667))
            ThreePointArc((12.045296714, -14.166666667), (11.980559052, -14.030858143), (11.911764706, -13.897058824))
            Line((11.911764706, -13.897058824), (4.617647059, -0.220588235))
            ThreePointArc((4.617647059, -0.220588235), (4.5298575, 0.007464375), (4.5, 0.25))
            Line((4.5, 0.25), (4.5, 1))
            ThreePointArc((4.5, 1), (4.207106781, 1.707106781), (3.5, 2))
        make_face()
    extrude(amount=EXTRUDE_8_DEPTH)

    # 草图33 → 切除-拉伸22 (cut)
    with BuildSketch(Plane(origin=(0, 0, -2), x_dir=(-1, 0, 0), z_dir=(0, 0, -1))):
        with Locations((15.5, 16.5)):
            Circle(SKETCH_33_R)
        with Locations((7.5, 16.5)):
            Circle(SKETCH_33_R)
        with Locations((-0.5, 16.5)):
            Circle(SKETCH_33_R)
    extrude(amount=-CUT_EXTRUDE_22_DEPTH, mode=Mode.SUBTRACT)

    # 草图34 → 切除-拉伸23 (cut)
    with BuildSketch(Plane(origin=(0, 0, -2), x_dir=(-1, 0, 0), z_dir=(0, 0, -1))):
        with Locations((7.5, 9.5)):
            Rectangle(SKETCH_34_W, SKETCH_34_H)
    extrude(amount=-CUT_EXTRUDE_23_DEPTH, mode=Mode.SUBTRACT)

    # 草图35 → 切除-拉伸24 (cut)
    with BuildSketch(Plane.XY.offset(61).offset(CUT_EXTRUDE_START)):
        with Locations(Location((0.5, 16.5, 0), (0, 0, 180))):
            Circle(SKETCH_35_R)
        with Locations(Location((-7.5, 16.5, 0), (0, 0, 180))):
            Circle(SKETCH_35_R)
        with Locations(Location((-15.5, 16.5, 0), (0, 0, 180))):
            Circle(SKETCH_35_R)
        with Locations((-7.5, 9.5)):
            Rectangle(SKETCH_35_W, SKETCH_35_H)
    extrude(amount=CUT_EXTRUDE_24_DEPTH, mode=Mode.SUBTRACT)

    # 圆角15
    fillet_15_edges = [part.edges().sort_by_distance(p)[0] for p in [
        (-12.5, 13.5, 3),
        (-12.5, 5.5, 3),
        (-2.5, 5.5, 3),
        (-2.5, 13.5, 3),
        (-2.5, 5.5, 56),
        (-12.5, 5.5, 56),
        (-12.5, 13.5, 56),
        (-2.5, 13.5, 56),
    ]]
    fillet(fillet_15_edges, radius=FILLET_15_R)


solid = part.part
